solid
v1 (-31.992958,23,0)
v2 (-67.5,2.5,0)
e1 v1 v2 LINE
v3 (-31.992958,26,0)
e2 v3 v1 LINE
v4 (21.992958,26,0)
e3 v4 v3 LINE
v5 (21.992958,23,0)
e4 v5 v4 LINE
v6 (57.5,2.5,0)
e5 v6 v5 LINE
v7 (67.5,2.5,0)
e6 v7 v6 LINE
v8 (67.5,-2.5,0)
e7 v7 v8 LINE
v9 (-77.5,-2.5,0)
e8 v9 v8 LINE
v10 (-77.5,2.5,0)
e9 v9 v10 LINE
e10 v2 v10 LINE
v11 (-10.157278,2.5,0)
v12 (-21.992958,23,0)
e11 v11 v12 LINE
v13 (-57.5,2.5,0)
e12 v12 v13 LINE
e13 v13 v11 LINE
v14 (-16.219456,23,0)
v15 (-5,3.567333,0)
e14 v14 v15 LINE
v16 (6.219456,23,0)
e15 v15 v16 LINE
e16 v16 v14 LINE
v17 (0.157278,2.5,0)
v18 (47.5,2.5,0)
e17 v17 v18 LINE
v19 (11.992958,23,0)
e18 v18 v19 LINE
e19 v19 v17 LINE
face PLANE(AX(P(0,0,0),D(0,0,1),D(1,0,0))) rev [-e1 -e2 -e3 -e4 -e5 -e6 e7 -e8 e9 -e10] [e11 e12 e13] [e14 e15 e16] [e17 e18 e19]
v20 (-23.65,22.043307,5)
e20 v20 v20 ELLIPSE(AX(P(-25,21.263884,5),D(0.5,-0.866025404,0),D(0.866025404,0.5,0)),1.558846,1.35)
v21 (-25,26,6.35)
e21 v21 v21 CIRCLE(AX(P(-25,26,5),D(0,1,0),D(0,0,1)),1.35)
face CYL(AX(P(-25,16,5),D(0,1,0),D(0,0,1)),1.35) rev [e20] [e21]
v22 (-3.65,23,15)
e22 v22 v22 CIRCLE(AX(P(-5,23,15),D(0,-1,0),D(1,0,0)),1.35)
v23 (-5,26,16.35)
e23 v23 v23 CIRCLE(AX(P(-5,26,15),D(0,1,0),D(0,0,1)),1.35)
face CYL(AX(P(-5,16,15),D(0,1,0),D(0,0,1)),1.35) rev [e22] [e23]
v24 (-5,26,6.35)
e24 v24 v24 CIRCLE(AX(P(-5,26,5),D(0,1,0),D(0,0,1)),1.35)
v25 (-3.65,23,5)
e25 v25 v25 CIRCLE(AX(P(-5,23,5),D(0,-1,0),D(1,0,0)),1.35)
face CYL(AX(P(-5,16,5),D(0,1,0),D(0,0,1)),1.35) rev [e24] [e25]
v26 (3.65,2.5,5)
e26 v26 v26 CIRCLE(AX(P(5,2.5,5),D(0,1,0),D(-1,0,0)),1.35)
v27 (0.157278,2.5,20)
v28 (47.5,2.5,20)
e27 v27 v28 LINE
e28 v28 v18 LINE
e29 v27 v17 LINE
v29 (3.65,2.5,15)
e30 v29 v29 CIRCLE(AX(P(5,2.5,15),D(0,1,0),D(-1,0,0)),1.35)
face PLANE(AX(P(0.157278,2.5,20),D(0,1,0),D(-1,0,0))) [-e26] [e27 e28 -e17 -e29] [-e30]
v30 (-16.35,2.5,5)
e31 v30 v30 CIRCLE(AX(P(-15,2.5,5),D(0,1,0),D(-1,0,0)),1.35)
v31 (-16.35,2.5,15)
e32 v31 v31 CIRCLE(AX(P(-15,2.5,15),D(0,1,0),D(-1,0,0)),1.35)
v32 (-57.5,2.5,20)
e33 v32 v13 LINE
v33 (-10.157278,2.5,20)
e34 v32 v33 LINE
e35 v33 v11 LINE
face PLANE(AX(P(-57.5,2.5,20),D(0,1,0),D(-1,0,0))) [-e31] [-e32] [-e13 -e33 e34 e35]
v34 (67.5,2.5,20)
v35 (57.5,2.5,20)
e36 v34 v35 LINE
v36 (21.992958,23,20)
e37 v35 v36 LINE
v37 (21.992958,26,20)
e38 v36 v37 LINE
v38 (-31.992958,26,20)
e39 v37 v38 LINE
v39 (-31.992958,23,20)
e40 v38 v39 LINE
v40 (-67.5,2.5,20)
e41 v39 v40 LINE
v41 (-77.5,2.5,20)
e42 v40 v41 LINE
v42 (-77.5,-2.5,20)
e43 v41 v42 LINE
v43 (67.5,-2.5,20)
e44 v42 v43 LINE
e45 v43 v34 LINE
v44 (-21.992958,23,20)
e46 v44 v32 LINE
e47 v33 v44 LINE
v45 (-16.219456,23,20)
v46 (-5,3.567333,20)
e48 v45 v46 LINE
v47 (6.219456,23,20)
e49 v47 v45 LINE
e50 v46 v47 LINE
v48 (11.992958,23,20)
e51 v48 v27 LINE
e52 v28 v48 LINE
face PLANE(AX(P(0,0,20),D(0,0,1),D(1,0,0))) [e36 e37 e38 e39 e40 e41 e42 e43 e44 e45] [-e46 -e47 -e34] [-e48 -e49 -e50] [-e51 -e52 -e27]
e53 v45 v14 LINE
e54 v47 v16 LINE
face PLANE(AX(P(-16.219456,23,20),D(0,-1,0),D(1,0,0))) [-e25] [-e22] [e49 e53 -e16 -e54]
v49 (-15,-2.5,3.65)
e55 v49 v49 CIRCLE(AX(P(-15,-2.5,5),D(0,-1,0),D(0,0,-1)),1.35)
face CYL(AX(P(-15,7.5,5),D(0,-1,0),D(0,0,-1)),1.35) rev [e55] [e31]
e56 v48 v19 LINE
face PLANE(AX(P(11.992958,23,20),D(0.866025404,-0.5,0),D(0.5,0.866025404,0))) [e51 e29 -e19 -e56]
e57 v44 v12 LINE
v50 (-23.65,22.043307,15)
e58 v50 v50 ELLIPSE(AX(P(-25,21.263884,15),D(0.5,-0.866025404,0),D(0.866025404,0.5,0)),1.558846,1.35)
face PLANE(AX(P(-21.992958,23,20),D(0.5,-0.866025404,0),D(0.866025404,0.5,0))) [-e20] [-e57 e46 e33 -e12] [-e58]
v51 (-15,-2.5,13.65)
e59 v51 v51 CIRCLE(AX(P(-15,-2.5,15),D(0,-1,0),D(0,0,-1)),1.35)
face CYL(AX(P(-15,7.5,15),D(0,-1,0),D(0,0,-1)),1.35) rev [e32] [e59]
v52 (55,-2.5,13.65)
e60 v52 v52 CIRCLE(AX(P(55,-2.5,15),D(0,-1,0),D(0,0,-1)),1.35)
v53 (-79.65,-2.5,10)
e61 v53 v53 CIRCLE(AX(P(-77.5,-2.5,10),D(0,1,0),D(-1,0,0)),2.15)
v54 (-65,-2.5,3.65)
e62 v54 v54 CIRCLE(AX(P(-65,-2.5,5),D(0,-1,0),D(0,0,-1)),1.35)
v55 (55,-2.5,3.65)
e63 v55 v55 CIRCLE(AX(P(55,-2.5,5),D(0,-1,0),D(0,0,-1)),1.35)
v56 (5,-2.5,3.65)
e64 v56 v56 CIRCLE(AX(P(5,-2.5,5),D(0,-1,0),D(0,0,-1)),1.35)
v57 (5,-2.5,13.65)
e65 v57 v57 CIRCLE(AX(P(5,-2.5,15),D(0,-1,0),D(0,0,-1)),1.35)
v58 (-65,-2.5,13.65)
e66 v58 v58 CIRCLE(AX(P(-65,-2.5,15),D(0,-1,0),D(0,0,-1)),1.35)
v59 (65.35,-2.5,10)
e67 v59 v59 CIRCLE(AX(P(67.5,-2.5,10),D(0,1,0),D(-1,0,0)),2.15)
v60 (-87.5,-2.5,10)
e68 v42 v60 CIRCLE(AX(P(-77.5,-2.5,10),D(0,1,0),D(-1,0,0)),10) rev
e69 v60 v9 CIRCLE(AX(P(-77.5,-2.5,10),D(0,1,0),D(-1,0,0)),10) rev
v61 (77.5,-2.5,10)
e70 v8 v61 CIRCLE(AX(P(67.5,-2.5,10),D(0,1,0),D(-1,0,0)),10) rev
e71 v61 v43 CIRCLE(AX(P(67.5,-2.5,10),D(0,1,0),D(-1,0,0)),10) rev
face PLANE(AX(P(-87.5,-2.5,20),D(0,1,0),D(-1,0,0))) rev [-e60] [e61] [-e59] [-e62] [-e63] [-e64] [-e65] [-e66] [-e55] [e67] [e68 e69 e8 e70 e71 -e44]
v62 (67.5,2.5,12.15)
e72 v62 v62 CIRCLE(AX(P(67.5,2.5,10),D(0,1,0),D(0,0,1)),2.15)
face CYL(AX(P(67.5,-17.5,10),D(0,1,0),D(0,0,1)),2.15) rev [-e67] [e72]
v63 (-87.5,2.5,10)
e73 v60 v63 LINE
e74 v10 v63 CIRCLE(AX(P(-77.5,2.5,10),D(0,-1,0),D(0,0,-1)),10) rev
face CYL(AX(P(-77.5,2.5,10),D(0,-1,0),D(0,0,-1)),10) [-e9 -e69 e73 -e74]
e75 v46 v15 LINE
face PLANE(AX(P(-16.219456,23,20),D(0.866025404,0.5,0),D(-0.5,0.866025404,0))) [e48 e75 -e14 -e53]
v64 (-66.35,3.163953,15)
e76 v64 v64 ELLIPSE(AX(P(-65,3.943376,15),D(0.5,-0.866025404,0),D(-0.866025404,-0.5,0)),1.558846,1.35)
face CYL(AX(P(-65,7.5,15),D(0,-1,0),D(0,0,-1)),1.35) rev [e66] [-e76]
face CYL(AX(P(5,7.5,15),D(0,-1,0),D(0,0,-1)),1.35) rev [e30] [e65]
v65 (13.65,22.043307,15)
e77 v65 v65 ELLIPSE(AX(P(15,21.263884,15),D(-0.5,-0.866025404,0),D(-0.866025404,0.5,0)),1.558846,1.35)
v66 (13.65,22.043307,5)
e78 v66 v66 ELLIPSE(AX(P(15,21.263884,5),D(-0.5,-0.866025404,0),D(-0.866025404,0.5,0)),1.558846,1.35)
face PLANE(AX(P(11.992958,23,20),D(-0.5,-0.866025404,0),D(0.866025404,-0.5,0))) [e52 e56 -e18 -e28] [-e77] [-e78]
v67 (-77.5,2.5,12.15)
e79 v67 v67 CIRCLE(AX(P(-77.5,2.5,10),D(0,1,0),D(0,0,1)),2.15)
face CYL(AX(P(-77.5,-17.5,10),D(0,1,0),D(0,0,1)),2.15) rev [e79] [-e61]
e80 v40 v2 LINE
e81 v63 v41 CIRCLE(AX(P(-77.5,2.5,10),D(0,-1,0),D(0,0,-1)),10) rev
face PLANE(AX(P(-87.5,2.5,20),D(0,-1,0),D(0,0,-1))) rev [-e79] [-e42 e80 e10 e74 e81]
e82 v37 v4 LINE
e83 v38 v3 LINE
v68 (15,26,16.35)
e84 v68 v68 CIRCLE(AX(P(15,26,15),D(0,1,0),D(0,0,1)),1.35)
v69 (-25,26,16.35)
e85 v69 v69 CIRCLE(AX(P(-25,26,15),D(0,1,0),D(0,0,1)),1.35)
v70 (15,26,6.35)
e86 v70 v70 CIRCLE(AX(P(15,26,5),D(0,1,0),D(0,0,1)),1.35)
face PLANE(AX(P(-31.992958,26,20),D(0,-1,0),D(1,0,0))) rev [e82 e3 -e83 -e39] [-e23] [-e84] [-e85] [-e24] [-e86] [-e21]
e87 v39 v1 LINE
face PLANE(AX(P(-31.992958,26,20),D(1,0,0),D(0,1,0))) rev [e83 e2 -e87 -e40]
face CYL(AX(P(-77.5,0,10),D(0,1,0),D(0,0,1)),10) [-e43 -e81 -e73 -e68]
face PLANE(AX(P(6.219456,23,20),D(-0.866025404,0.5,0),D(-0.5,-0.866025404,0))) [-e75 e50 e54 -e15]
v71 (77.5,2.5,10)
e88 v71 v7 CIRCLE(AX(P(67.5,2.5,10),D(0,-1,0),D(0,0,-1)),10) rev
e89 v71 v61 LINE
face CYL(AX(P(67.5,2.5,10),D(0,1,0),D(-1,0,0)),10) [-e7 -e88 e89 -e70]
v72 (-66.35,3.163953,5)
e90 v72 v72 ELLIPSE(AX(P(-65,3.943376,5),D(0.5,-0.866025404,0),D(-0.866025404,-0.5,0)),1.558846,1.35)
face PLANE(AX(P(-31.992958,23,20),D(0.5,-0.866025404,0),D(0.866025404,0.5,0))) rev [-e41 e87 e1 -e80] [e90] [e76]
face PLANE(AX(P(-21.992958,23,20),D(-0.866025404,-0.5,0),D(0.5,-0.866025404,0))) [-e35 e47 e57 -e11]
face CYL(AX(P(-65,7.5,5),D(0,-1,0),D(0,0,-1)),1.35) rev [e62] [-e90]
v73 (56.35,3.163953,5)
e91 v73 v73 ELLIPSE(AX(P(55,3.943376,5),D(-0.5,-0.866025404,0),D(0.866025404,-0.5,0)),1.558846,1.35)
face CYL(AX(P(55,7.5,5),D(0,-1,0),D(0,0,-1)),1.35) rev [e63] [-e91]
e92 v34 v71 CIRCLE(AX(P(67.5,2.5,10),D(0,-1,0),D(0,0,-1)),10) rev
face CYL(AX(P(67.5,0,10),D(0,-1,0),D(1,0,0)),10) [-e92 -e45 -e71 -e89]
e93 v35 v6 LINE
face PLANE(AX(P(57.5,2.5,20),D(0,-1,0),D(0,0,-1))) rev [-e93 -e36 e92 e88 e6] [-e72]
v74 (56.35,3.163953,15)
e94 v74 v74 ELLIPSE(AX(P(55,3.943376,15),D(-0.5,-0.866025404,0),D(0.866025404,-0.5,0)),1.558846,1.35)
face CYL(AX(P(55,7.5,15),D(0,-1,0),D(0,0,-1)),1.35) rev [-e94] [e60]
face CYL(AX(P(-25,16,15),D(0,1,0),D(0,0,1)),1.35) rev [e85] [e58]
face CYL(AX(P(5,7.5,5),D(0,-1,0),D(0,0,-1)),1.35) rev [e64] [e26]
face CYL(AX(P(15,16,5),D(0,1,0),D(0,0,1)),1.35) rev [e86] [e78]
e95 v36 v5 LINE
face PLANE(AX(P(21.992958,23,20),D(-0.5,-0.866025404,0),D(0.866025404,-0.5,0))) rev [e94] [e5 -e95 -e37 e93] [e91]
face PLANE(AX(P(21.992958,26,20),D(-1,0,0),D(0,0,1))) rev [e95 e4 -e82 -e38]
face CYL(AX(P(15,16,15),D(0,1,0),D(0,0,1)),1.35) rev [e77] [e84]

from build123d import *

# Parameters (mm, degrees)
EXTRUDE_1_DEPTH     = 20
SKETCH_2_R          = 2.15
CUT_EXTRUDE_1_DEPTH = 20
SKETCH_3_R          = 1.35
CUT_EXTRUDE_2_DEPTH = 10
FILLET_1_R          = 10
SKETCH_4_R          = 1.35
CUT_EXTRUDE_3_DEPTH = 10


with BuildPart() as part:
    # 스케치1 → 보스-돌출1 (new body)
    with BuildSketch(Plane.XY):
        Polygon((-31.992958445, 23), (-67.5, 2.5), (-87.5, 2.5), (-87.5, -2.5), (77.5, -2.5), (77.5, 2.5), (57.5, 2.5), (21.992958445, 23), (21.992958445, 26), (-31.992958445, 26), align=None)
        Polygon((0.157277926, 2.5), (47.5, 2.5), (11.992958445, 23), align=None, mode=Mode.SUBTRACT)
        Polygon((-16.219455753, 23), (6.219455753, 23), (-5, 3.567332603), align=None, mode=Mode.SUBTRACT)
        Polygon((-21.992958445, 23), (-57.5, 2.5), (-10.157277926, 2.5), align=None, mode=Mode.SUBTRACT)
    extrude(amount=EXTRUDE_1_DEPTH)

    # 스케치2 → 컷-돌출1 (cut)
    with BuildSketch(Plane(origin=(0, 2.5, 0), x_dir=(1, 0, 0), z_dir=(0, 1, 0))):
        with Locations(Location((-77.5, -10, 0), (0, 0, 270))):
            Circle(SKETCH_2_R)
        with Locations(Location((67.5, -10, 0), (0, 0, 270))):
            Circle(SKETCH_2_R)
    extrude(amount=-CUT_EXTRUDE_1_DEPTH, mode=Mode.SUBTRACT)

    # 스케치3 → 컷-돌출2 (cut)
    with BuildSketch(Plane(origin=(0, 26, 0), x_dir=(1, 0, 0), z_dir=(0, 1, 0))):
        with Locations(Location((-25, -5, 0), (0, 0, 270))):
            Circle(SKETCH_3_R)
        with Locations(Location((-25, -15, 0), (0, 0, 270))):
            Circle(SKETCH_3_R)
        with Locations(Location((-5, -5, 0), (0, 0, 270))):
            Circle(SKETCH_3_R)
        with Locations(Location((-5, -15, 0), (0, 0, 270))):
            Circle(SKETCH_3_R)
        with Locations(Location((15, -5, 0), (0, 0, 270))):
            Circle(SKETCH_3_R)
        with Locations(Location((15, -15, 0), (0, 0, 270))):
            Circle(SKETCH_3_R)
    extrude(amount=-CUT_EXTRUDE_2_DEPTH, mode=Mode.SUBTRACT)

    # 필렛1
    fillet_1_edges = [part.edges().sort_by_distance(p)[0] for p in [
        (77.5, 0, 0),
        (77.5, 0, 20),
        (-87.5, 0, 0),
        (-87.5, 0, 20),
    ]]
    fillet(fillet_1_edges, radius=FILLET_1_R - 0.0001)  # a hair under: the kernel refuses the full size

    # 스케치4 → 컷-돌출3 (cut)
    with BuildSketch(Plane.XZ.offset(2.5)):
        with Locations(Location((-65, 15, 0), (0, 0, 270))):
            Circle(SKETCH_4_R)
        with Locations(Location((-65, 5, 0), (0, 0, 270))):
            Circle(SKETCH_4_R)
        with Locations(Location((55, 5, 0), (0, 0, 270))):
            Circle(SKETCH_4_R)
        with Locations(Location((55, 15, 0), (0, 0, 270))):
            Circle(SKETCH_4_R)
        with Locations(Location((-15, 15, 0), (0, 0, 270))):
            Circle(SKETCH_4_R)
        with Locations(Location((5, 15, 0), (0, 0, 270))):
            Circle(SKETCH_4_R)
        with Locations(Location((-15, 5, 0), (0, 0, 270))):
            Circle(SKETCH_4_R)
        with Locations(Location((5, 5, 0), (0, 0, 270))):
            Circle(SKETCH_4_R)
    extrude(amount=-CUT_EXTRUDE_3_DEPTH, mode=Mode.SUBTRACT)


solid = part.part
